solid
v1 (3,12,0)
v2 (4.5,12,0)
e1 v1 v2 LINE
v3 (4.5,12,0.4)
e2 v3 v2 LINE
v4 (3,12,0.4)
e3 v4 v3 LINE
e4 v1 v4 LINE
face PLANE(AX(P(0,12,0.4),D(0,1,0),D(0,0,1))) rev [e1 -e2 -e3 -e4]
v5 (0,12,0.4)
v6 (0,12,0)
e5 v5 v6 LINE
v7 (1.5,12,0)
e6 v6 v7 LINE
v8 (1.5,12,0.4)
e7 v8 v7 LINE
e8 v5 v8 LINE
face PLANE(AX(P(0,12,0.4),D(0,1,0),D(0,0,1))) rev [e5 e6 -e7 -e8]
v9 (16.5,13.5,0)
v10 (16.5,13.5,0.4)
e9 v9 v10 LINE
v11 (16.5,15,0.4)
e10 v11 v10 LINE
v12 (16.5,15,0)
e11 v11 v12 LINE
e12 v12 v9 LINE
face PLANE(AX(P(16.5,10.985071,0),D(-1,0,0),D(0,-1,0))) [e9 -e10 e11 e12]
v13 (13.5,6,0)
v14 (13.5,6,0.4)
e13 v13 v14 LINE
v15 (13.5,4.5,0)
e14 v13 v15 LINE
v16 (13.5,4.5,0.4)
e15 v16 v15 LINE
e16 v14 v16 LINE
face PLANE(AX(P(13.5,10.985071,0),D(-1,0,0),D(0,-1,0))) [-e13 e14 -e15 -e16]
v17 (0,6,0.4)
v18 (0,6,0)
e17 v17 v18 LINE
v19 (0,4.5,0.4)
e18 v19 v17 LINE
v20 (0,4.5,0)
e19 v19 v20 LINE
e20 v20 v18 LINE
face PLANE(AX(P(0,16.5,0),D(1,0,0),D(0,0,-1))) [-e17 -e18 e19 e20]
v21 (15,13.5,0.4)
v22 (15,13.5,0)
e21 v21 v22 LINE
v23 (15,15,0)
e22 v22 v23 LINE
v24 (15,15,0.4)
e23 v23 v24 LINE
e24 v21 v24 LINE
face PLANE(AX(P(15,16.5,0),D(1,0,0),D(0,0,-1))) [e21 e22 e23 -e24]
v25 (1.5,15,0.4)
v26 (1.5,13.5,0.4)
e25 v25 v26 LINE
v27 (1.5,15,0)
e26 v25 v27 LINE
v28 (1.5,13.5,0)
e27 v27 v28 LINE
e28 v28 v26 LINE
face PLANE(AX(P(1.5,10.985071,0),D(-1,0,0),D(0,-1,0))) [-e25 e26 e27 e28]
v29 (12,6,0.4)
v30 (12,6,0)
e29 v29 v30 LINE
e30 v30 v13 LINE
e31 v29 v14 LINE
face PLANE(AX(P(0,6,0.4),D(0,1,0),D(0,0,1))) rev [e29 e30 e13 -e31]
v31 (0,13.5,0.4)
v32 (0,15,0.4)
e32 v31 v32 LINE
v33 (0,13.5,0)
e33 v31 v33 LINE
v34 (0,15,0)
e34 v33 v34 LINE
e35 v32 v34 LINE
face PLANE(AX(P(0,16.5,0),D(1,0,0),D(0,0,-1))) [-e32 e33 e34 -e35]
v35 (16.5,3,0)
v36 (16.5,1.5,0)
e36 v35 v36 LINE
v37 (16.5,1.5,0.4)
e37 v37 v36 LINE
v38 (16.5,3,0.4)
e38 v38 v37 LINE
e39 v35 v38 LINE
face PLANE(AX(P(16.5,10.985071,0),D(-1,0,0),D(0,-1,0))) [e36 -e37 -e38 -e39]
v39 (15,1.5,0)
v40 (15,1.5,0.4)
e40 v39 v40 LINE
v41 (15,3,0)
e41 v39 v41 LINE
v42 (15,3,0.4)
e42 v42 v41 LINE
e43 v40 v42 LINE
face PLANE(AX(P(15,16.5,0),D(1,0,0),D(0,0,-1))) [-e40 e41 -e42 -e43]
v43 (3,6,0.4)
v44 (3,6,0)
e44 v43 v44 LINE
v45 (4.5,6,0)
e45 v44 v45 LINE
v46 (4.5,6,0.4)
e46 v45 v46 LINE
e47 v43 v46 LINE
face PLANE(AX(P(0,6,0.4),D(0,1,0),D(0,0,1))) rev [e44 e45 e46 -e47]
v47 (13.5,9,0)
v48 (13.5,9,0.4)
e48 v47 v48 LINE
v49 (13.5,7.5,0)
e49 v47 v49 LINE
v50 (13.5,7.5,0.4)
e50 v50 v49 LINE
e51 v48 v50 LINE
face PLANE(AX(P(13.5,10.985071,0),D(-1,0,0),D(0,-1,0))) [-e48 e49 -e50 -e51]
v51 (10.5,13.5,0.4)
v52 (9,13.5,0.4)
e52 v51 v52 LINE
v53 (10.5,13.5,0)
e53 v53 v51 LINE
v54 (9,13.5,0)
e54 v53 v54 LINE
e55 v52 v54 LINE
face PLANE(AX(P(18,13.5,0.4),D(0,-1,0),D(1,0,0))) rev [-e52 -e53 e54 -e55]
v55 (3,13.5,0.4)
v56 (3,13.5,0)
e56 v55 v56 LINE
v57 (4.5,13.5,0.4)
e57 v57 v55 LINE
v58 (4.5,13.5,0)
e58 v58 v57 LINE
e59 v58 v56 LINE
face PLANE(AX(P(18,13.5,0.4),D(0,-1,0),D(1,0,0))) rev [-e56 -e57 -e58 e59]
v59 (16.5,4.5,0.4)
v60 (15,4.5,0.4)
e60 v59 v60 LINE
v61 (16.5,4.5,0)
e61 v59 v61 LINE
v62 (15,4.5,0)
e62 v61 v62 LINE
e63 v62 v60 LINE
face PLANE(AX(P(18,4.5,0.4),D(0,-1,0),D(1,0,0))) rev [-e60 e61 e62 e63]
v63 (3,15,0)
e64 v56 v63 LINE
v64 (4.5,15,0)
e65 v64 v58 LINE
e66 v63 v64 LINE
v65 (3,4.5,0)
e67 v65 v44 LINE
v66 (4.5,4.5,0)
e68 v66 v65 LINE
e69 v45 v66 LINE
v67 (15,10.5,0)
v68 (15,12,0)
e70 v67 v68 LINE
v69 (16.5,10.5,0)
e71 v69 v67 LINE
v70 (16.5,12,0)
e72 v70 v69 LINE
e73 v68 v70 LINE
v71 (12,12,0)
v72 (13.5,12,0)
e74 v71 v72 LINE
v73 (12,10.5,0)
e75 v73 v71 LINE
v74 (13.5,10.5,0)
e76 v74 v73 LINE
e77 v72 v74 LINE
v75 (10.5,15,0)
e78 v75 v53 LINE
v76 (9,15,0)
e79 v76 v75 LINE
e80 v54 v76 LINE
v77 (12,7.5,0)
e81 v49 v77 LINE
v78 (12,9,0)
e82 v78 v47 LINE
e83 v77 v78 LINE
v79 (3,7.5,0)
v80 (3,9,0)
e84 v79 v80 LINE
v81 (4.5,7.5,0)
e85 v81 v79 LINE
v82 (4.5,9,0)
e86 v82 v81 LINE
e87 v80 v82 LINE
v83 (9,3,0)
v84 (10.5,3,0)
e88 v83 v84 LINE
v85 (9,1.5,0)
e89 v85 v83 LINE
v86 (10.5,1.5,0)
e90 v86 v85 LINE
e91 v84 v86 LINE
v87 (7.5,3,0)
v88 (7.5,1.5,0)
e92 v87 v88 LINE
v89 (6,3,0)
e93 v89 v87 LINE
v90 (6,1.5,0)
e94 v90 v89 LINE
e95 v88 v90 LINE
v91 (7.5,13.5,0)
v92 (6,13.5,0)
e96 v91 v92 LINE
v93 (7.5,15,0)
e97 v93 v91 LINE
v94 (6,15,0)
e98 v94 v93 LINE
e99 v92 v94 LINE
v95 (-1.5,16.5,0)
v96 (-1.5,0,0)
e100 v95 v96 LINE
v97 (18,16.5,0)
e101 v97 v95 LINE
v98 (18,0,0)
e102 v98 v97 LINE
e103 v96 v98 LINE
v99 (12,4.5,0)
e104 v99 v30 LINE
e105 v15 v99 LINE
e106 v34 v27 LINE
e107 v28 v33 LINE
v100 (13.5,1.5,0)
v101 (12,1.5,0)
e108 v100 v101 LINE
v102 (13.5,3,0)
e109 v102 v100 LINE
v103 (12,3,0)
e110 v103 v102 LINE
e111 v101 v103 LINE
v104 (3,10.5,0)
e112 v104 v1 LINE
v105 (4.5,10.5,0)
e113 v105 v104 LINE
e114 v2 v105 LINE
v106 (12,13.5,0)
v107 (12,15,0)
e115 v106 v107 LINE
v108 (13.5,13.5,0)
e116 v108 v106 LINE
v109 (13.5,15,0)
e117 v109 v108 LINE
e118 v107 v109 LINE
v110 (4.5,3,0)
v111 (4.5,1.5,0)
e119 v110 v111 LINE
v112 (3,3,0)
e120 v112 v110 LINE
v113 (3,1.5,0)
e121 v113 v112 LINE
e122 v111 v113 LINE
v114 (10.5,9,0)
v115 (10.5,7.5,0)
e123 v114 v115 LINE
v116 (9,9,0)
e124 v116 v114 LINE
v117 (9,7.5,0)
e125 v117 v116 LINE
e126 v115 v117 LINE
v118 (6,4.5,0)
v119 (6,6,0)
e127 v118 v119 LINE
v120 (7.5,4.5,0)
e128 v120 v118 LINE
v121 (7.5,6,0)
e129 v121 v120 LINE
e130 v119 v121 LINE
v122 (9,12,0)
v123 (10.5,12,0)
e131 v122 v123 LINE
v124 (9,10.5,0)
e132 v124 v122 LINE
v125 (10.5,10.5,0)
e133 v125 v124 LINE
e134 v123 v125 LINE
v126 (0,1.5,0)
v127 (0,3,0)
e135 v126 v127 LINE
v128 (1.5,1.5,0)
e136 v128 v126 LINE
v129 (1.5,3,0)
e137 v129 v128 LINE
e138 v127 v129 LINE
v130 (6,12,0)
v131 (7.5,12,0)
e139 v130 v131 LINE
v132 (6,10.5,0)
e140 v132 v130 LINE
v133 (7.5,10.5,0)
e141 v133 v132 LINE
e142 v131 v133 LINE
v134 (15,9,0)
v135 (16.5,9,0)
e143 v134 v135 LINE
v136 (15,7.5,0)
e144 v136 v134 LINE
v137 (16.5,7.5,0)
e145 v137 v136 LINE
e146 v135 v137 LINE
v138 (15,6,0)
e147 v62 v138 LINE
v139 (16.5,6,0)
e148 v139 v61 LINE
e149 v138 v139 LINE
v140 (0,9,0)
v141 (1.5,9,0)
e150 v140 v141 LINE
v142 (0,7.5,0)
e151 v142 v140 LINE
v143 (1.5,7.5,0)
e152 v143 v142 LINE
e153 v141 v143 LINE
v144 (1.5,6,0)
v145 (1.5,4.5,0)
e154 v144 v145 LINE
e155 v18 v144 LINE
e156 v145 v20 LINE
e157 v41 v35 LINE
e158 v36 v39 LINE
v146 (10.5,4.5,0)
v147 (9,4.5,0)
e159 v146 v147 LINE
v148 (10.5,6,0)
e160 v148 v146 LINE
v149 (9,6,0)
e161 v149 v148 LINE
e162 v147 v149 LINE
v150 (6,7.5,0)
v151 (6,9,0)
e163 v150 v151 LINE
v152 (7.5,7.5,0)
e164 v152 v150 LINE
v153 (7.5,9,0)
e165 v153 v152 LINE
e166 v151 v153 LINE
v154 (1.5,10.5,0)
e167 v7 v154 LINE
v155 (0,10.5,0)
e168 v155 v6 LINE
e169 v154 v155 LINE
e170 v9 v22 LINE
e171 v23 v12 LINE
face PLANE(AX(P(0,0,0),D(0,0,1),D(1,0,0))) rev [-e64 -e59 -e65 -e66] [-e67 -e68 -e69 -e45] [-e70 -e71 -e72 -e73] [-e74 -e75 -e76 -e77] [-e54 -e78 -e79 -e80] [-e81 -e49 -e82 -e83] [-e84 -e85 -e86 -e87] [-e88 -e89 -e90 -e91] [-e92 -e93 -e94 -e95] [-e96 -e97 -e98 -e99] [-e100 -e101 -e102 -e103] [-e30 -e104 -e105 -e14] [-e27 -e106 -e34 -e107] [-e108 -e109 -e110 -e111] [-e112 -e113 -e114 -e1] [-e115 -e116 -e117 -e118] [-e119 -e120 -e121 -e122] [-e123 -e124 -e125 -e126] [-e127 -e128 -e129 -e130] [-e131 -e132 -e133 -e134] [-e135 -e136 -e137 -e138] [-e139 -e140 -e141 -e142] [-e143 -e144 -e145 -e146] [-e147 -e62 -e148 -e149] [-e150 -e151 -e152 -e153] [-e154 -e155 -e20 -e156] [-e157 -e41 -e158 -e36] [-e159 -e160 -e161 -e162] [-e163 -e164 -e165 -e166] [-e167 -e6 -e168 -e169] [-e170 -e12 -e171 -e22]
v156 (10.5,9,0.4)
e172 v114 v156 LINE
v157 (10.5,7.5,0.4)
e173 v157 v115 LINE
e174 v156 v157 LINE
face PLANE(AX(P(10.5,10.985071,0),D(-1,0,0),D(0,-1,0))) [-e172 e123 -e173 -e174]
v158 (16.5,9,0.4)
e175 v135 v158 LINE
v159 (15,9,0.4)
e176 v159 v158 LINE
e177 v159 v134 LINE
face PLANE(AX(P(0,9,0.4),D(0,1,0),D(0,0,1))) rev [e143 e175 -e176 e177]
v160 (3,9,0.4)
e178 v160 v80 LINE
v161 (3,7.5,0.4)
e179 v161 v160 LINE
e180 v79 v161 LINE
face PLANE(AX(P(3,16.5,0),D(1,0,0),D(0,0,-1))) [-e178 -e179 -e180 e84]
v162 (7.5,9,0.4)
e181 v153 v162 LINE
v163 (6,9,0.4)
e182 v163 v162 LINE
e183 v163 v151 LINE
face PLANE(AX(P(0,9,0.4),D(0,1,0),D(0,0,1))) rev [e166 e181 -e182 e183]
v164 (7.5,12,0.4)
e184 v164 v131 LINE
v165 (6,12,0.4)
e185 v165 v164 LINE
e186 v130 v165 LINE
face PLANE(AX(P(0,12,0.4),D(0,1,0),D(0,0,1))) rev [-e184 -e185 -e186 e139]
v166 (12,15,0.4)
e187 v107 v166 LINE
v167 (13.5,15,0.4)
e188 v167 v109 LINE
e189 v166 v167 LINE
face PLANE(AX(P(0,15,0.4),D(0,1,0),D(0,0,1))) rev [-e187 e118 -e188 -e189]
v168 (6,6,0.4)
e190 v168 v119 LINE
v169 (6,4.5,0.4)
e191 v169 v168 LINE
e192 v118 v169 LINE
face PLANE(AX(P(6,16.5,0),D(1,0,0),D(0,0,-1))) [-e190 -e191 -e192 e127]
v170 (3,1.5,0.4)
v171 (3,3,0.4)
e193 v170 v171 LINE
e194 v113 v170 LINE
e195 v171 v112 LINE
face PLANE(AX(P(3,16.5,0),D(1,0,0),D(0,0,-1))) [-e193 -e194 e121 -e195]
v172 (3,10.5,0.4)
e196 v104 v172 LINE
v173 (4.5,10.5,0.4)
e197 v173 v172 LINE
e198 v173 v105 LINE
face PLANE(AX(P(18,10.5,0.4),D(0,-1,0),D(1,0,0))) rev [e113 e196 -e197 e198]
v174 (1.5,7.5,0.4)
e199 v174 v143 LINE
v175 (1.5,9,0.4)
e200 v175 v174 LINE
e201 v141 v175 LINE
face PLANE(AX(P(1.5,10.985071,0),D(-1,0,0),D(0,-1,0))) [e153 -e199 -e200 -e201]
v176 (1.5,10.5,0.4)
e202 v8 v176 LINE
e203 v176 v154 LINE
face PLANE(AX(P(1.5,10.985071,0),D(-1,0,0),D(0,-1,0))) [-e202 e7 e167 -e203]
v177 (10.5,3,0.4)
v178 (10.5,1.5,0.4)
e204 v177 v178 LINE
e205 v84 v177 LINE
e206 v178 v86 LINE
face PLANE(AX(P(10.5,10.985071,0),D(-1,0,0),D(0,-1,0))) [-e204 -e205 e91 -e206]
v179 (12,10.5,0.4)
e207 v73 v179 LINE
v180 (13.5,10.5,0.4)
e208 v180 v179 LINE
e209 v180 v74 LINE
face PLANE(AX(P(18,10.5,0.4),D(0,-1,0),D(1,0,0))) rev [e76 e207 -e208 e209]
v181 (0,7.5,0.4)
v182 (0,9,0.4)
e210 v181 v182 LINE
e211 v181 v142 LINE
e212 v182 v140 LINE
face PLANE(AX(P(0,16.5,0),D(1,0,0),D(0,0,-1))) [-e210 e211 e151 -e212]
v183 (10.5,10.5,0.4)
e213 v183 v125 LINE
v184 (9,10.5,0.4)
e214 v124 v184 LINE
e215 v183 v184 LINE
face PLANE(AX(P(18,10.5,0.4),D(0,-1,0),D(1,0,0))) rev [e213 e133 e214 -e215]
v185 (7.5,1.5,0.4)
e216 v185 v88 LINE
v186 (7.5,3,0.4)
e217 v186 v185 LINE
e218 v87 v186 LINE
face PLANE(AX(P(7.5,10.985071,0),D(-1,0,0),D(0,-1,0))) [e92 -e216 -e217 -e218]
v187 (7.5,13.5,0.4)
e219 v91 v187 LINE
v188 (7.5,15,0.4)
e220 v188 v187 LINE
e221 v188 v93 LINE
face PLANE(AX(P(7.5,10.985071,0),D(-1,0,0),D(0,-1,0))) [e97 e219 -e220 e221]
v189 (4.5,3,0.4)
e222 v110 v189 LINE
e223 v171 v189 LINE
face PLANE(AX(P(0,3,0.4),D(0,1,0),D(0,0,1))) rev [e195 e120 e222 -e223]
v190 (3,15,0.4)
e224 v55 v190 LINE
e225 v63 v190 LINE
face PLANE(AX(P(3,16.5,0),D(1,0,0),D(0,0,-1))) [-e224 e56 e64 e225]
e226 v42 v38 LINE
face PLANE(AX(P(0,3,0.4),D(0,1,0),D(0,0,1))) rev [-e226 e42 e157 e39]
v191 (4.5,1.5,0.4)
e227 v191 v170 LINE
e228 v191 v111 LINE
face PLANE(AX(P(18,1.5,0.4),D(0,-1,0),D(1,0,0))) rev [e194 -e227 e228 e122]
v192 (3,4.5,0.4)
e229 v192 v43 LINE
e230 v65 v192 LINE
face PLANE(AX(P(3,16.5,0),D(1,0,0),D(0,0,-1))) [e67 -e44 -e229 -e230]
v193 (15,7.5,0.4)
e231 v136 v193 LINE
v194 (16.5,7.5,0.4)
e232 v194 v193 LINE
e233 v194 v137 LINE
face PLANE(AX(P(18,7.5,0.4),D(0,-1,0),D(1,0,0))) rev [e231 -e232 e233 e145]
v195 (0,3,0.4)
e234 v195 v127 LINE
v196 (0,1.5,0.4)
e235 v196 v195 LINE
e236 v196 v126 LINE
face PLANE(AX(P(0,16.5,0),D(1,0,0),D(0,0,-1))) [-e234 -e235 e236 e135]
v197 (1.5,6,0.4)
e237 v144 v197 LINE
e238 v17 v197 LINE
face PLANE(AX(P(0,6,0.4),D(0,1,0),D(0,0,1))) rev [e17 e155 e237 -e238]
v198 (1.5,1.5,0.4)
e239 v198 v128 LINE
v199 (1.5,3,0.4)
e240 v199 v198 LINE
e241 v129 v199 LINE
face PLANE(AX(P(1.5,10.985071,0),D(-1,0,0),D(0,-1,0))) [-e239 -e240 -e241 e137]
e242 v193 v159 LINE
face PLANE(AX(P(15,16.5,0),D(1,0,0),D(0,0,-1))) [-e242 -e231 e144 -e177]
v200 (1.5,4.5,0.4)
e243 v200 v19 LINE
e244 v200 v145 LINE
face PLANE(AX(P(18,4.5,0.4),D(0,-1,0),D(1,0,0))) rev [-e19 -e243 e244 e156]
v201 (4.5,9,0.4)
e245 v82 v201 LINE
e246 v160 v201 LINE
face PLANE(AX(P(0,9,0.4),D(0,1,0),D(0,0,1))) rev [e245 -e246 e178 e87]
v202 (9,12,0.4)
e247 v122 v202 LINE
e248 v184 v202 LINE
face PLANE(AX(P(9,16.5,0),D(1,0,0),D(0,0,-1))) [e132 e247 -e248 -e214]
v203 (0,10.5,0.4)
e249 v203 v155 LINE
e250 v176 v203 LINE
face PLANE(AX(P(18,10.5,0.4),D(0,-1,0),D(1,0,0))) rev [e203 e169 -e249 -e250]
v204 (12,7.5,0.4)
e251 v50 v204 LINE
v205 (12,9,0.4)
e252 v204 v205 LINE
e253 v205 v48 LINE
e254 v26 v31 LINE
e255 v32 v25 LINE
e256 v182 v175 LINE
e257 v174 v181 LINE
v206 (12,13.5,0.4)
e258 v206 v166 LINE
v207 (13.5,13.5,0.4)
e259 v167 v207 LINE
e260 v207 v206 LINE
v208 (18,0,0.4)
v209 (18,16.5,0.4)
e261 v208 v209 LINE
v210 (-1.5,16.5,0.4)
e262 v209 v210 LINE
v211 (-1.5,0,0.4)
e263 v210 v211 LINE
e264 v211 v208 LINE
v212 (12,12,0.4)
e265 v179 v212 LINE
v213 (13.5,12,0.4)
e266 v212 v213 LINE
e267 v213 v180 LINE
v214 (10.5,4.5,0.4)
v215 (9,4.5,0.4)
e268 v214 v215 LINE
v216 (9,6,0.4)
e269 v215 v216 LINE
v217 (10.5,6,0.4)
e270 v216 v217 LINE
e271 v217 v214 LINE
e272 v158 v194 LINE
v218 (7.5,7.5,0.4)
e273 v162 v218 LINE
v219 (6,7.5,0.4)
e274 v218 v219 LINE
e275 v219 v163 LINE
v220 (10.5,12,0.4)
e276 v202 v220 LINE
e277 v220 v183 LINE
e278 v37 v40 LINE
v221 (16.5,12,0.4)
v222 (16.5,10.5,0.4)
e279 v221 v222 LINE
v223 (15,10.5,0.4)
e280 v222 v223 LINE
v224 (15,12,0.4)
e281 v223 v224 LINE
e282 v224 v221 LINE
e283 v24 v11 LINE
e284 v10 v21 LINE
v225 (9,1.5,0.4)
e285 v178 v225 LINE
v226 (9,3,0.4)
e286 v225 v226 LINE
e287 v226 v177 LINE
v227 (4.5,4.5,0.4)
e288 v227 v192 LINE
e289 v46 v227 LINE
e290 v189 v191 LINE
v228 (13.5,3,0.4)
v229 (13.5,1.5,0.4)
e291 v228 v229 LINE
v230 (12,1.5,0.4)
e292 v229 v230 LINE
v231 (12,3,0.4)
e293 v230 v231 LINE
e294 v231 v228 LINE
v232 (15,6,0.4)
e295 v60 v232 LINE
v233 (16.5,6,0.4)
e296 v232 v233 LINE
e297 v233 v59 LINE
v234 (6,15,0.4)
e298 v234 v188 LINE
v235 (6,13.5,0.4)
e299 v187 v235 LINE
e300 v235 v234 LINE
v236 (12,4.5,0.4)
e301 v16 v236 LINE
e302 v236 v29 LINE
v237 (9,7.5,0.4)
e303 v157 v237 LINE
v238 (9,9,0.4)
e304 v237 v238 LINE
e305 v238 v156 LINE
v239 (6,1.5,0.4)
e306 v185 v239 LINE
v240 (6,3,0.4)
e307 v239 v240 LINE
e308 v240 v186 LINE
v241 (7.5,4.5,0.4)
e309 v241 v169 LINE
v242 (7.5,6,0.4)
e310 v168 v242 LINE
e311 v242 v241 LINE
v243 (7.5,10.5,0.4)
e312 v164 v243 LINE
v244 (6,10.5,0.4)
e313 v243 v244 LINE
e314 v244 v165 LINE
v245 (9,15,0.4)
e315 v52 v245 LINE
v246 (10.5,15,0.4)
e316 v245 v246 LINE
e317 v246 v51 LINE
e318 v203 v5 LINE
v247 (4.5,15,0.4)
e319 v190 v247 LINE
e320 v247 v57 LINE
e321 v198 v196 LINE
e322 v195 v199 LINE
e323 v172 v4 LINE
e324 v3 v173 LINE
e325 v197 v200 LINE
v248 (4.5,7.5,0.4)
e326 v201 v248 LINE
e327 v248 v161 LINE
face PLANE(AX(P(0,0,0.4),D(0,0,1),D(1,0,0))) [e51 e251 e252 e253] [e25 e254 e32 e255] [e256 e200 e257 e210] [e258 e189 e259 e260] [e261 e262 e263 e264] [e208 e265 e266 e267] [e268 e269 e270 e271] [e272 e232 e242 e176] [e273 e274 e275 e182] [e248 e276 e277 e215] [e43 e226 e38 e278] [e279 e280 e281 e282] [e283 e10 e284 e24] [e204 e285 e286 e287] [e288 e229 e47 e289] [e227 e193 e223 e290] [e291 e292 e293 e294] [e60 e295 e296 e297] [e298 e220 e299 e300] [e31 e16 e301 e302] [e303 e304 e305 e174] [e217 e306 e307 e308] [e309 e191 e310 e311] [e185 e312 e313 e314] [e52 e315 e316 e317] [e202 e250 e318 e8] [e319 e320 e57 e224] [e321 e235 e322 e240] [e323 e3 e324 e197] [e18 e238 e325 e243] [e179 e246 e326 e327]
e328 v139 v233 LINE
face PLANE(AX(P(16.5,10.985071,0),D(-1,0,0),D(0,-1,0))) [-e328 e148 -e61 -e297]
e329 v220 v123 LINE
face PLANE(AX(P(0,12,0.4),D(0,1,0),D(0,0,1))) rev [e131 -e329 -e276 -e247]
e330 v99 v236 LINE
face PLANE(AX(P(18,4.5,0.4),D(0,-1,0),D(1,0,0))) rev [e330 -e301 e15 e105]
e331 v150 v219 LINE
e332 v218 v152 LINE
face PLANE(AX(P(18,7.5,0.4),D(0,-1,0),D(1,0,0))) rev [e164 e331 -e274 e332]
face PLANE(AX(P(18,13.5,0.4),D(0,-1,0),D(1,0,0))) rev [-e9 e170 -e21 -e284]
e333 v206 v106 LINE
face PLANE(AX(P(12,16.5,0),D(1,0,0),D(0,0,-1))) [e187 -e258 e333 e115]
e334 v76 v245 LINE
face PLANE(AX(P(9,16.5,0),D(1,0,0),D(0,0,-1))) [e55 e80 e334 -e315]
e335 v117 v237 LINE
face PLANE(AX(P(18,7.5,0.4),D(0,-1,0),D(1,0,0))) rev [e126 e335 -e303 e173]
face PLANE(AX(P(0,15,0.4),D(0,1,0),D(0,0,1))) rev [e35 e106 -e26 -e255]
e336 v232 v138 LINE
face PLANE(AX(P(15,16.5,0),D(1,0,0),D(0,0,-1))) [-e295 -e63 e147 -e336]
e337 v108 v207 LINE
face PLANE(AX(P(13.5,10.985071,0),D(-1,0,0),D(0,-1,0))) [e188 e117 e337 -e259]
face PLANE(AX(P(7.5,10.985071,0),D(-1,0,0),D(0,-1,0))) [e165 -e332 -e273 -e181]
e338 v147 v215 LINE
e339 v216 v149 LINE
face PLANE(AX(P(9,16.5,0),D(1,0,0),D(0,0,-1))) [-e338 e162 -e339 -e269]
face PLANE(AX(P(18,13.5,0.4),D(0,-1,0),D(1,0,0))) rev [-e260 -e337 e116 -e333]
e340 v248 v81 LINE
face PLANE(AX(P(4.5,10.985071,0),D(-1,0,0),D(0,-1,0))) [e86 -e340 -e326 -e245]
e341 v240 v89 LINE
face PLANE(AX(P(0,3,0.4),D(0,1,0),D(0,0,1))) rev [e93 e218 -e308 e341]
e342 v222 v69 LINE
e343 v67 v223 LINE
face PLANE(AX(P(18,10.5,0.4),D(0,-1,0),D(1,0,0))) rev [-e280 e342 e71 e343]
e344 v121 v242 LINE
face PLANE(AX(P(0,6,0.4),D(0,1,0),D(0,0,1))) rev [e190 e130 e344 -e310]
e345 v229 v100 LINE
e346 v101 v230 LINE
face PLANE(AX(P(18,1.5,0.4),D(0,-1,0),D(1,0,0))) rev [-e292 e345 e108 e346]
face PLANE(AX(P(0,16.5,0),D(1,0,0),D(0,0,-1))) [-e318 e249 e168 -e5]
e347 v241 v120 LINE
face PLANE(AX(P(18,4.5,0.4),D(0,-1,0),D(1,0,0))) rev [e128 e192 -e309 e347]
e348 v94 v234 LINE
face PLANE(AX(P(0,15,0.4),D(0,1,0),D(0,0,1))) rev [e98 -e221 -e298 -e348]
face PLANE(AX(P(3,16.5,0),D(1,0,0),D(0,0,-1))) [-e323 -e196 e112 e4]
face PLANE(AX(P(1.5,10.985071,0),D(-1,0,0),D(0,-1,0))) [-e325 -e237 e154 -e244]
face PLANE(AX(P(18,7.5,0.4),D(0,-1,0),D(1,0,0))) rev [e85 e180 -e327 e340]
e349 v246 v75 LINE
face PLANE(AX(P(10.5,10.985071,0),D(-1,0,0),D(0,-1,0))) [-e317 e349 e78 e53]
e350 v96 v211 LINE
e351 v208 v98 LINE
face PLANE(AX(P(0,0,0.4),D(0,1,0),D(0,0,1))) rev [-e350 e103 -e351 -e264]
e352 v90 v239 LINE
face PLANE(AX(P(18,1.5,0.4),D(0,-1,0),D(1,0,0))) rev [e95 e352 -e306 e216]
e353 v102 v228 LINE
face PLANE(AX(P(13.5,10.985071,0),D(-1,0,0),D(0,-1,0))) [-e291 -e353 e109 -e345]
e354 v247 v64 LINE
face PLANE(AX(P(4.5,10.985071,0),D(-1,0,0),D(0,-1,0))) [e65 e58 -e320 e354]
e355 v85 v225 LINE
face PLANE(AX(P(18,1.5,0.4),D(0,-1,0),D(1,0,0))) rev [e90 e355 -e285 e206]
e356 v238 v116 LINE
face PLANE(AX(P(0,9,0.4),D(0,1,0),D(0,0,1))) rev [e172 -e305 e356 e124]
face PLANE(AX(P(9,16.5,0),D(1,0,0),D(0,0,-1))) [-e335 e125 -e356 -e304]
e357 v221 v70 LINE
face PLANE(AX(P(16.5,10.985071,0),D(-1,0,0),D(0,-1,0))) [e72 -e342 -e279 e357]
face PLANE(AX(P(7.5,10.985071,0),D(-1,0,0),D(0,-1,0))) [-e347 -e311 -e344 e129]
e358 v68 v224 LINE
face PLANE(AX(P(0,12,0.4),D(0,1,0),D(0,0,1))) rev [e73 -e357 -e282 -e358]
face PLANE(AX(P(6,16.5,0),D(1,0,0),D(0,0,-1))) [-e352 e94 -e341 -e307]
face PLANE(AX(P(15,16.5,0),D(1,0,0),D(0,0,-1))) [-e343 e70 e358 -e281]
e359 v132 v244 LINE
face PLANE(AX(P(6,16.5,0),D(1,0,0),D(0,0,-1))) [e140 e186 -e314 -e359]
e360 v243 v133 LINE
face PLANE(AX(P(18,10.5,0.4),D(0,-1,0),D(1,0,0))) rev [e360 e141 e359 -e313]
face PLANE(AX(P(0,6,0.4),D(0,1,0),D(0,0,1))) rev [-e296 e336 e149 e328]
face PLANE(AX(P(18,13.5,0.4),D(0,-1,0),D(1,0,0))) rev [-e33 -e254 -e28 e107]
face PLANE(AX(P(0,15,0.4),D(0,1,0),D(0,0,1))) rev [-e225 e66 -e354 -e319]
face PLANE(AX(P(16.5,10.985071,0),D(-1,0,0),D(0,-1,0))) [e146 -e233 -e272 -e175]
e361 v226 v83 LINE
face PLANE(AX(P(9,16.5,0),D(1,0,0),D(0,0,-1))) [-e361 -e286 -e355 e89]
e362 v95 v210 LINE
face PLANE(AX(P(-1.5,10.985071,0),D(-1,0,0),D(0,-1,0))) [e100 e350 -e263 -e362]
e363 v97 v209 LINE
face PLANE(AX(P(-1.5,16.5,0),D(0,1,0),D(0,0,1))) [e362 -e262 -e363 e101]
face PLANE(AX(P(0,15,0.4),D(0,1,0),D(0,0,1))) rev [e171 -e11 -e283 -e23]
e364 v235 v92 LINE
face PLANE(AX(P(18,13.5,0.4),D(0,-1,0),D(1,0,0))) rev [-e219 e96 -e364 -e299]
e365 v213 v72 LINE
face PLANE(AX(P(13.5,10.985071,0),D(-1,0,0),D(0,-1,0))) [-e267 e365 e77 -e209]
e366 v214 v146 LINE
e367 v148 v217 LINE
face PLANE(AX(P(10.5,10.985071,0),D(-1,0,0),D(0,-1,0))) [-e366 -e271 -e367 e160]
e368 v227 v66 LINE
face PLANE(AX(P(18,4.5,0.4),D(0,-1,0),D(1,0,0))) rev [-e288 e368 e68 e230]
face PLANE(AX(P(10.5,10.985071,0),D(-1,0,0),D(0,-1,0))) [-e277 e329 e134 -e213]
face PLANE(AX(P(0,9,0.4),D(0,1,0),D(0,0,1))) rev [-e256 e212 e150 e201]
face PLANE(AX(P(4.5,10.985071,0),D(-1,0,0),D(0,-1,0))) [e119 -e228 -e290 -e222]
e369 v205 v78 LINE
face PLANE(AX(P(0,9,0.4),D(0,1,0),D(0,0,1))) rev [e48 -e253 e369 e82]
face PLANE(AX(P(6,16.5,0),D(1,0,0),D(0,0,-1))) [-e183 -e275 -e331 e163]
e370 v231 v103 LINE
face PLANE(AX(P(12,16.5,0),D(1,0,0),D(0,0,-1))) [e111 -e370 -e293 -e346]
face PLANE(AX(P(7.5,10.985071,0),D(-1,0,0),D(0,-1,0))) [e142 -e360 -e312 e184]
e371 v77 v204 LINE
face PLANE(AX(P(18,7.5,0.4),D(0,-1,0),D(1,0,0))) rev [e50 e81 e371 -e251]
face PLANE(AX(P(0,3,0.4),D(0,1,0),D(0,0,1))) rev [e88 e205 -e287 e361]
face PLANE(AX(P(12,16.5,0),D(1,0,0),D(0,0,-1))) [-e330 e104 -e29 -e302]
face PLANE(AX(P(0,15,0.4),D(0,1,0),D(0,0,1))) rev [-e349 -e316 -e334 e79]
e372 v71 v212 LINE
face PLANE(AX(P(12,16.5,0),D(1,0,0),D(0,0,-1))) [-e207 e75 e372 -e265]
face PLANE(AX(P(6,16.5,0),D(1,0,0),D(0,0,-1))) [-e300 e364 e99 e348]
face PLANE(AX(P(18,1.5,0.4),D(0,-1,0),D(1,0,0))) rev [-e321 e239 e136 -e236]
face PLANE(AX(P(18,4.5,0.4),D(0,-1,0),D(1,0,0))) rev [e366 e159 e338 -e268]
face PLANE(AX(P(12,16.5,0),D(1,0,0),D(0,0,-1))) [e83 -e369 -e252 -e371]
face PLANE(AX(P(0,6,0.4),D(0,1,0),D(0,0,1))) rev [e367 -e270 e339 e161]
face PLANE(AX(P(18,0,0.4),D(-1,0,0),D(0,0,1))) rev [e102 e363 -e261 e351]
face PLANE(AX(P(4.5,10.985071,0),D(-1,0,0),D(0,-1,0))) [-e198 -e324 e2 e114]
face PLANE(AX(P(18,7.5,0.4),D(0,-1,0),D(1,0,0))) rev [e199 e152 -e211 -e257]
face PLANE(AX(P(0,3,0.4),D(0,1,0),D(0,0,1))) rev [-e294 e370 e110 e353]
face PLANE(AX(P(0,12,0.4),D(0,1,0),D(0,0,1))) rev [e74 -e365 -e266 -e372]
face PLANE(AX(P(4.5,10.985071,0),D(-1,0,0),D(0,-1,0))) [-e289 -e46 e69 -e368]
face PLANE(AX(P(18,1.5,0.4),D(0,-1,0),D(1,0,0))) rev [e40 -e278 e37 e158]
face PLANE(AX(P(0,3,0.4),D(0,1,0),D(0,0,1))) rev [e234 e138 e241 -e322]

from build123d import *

# Parameters (mm, degrees)
SKETCH_1_W             = 18
SKETCH_1_H             = 1.5
EXTRUDE_1_DEPTH        = 0.4
PATTERN_LINEAR_1_COUNT = 6
PATTERN_LINEAR_1_PITCH = 3
EXTRUDE_3_DEPTH        = 0.4
PATTERN_LINEAR_2_COUNT = 7
PATTERN_LINEAR_2_PITCH = 3


with BuildPart() as part:
    # 草图1 → 凸台-拉伸1 (new body)
    with BuildSketch(Plane.XY):
        with Locations((9, 0.75)):
            Rectangle(SKETCH_1_W, SKETCH_1_H)
    extrude(amount=EXTRUDE_1_DEPTH)


with BuildPart() as pattern_linear_1_1:
    # 阵列(线性)1: pattern copy
    add(part.part.moved(Location(Vector(0, 1, 0) * (1 * PATTERN_LINEAR_1_PITCH))))


with BuildPart() as pattern_linear_1_2:
    # 阵列(线性)1: pattern copy
    add(part.part.moved(Location(Vector(0, 1, 0) * (2 * PATTERN_LINEAR_1_PITCH))))


with BuildPart() as pattern_linear_1_3:
    # 阵列(线性)1: pattern copy
    add(part.part.moved(Location(Vector(0, 1, 0) * (3 * PATTERN_LINEAR_1_PITCH))))


with BuildPart() as pattern_linear_1_4:
    # 阵列(线性)1: pattern copy
    add(part.part.moved(Location(Vector(0, 1, 0) * (4 * PATTERN_LINEAR_1_PITCH))))


with BuildPart() as pattern_linear_1_5:
    # 阵列(线性)1: pattern copy
    add(part.part.moved(Location(Vector(0, 1, 0) * (5 * PATTERN_LINEAR_1_PITCH))))


with BuildPart() as part_1:
    add(part.part)

    add(pattern_linear_1_1.part)  # 凸台-拉伸3 merges 阵列(线性)1_1

    add(pattern_linear_1_2.part)  # 凸台-拉伸3 merges 阵列(线性)1_2

    add(pattern_linear_1_3.part)  # 凸台-拉伸3 merges 阵列(线性)1_3
    # 草图3 → 凸台-拉伸3 (add)
    with BuildSketch(Plane.XY.offset(0.4)):
        Polygon((0, 16.5), (0, 10.5), (0, 0), (-1.5, 0), (-1.5, 10.98507125), (-1.5, 16.5), align=None)
    extrude_3 = extrude(amount=-EXTRUDE_3_DEPTH)

    # 阵列(线性)2: 凸台-拉伸3 ×7
    with Locations(*[(i * PATTERN_LINEAR_2_PITCH, 0, 0) for i in range(1, PATTERN_LINEAR_2_COUNT)]):
        add(extrude_3)

    # Combine 1: read off the stored shape, not the designer's step
    # Combine 1: union 阵列(线性)1_4, 阵列(线性)1_5
    add(pattern_linear_1_4.part)
    add(pattern_linear_1_5.part)


solid = part_1.part
